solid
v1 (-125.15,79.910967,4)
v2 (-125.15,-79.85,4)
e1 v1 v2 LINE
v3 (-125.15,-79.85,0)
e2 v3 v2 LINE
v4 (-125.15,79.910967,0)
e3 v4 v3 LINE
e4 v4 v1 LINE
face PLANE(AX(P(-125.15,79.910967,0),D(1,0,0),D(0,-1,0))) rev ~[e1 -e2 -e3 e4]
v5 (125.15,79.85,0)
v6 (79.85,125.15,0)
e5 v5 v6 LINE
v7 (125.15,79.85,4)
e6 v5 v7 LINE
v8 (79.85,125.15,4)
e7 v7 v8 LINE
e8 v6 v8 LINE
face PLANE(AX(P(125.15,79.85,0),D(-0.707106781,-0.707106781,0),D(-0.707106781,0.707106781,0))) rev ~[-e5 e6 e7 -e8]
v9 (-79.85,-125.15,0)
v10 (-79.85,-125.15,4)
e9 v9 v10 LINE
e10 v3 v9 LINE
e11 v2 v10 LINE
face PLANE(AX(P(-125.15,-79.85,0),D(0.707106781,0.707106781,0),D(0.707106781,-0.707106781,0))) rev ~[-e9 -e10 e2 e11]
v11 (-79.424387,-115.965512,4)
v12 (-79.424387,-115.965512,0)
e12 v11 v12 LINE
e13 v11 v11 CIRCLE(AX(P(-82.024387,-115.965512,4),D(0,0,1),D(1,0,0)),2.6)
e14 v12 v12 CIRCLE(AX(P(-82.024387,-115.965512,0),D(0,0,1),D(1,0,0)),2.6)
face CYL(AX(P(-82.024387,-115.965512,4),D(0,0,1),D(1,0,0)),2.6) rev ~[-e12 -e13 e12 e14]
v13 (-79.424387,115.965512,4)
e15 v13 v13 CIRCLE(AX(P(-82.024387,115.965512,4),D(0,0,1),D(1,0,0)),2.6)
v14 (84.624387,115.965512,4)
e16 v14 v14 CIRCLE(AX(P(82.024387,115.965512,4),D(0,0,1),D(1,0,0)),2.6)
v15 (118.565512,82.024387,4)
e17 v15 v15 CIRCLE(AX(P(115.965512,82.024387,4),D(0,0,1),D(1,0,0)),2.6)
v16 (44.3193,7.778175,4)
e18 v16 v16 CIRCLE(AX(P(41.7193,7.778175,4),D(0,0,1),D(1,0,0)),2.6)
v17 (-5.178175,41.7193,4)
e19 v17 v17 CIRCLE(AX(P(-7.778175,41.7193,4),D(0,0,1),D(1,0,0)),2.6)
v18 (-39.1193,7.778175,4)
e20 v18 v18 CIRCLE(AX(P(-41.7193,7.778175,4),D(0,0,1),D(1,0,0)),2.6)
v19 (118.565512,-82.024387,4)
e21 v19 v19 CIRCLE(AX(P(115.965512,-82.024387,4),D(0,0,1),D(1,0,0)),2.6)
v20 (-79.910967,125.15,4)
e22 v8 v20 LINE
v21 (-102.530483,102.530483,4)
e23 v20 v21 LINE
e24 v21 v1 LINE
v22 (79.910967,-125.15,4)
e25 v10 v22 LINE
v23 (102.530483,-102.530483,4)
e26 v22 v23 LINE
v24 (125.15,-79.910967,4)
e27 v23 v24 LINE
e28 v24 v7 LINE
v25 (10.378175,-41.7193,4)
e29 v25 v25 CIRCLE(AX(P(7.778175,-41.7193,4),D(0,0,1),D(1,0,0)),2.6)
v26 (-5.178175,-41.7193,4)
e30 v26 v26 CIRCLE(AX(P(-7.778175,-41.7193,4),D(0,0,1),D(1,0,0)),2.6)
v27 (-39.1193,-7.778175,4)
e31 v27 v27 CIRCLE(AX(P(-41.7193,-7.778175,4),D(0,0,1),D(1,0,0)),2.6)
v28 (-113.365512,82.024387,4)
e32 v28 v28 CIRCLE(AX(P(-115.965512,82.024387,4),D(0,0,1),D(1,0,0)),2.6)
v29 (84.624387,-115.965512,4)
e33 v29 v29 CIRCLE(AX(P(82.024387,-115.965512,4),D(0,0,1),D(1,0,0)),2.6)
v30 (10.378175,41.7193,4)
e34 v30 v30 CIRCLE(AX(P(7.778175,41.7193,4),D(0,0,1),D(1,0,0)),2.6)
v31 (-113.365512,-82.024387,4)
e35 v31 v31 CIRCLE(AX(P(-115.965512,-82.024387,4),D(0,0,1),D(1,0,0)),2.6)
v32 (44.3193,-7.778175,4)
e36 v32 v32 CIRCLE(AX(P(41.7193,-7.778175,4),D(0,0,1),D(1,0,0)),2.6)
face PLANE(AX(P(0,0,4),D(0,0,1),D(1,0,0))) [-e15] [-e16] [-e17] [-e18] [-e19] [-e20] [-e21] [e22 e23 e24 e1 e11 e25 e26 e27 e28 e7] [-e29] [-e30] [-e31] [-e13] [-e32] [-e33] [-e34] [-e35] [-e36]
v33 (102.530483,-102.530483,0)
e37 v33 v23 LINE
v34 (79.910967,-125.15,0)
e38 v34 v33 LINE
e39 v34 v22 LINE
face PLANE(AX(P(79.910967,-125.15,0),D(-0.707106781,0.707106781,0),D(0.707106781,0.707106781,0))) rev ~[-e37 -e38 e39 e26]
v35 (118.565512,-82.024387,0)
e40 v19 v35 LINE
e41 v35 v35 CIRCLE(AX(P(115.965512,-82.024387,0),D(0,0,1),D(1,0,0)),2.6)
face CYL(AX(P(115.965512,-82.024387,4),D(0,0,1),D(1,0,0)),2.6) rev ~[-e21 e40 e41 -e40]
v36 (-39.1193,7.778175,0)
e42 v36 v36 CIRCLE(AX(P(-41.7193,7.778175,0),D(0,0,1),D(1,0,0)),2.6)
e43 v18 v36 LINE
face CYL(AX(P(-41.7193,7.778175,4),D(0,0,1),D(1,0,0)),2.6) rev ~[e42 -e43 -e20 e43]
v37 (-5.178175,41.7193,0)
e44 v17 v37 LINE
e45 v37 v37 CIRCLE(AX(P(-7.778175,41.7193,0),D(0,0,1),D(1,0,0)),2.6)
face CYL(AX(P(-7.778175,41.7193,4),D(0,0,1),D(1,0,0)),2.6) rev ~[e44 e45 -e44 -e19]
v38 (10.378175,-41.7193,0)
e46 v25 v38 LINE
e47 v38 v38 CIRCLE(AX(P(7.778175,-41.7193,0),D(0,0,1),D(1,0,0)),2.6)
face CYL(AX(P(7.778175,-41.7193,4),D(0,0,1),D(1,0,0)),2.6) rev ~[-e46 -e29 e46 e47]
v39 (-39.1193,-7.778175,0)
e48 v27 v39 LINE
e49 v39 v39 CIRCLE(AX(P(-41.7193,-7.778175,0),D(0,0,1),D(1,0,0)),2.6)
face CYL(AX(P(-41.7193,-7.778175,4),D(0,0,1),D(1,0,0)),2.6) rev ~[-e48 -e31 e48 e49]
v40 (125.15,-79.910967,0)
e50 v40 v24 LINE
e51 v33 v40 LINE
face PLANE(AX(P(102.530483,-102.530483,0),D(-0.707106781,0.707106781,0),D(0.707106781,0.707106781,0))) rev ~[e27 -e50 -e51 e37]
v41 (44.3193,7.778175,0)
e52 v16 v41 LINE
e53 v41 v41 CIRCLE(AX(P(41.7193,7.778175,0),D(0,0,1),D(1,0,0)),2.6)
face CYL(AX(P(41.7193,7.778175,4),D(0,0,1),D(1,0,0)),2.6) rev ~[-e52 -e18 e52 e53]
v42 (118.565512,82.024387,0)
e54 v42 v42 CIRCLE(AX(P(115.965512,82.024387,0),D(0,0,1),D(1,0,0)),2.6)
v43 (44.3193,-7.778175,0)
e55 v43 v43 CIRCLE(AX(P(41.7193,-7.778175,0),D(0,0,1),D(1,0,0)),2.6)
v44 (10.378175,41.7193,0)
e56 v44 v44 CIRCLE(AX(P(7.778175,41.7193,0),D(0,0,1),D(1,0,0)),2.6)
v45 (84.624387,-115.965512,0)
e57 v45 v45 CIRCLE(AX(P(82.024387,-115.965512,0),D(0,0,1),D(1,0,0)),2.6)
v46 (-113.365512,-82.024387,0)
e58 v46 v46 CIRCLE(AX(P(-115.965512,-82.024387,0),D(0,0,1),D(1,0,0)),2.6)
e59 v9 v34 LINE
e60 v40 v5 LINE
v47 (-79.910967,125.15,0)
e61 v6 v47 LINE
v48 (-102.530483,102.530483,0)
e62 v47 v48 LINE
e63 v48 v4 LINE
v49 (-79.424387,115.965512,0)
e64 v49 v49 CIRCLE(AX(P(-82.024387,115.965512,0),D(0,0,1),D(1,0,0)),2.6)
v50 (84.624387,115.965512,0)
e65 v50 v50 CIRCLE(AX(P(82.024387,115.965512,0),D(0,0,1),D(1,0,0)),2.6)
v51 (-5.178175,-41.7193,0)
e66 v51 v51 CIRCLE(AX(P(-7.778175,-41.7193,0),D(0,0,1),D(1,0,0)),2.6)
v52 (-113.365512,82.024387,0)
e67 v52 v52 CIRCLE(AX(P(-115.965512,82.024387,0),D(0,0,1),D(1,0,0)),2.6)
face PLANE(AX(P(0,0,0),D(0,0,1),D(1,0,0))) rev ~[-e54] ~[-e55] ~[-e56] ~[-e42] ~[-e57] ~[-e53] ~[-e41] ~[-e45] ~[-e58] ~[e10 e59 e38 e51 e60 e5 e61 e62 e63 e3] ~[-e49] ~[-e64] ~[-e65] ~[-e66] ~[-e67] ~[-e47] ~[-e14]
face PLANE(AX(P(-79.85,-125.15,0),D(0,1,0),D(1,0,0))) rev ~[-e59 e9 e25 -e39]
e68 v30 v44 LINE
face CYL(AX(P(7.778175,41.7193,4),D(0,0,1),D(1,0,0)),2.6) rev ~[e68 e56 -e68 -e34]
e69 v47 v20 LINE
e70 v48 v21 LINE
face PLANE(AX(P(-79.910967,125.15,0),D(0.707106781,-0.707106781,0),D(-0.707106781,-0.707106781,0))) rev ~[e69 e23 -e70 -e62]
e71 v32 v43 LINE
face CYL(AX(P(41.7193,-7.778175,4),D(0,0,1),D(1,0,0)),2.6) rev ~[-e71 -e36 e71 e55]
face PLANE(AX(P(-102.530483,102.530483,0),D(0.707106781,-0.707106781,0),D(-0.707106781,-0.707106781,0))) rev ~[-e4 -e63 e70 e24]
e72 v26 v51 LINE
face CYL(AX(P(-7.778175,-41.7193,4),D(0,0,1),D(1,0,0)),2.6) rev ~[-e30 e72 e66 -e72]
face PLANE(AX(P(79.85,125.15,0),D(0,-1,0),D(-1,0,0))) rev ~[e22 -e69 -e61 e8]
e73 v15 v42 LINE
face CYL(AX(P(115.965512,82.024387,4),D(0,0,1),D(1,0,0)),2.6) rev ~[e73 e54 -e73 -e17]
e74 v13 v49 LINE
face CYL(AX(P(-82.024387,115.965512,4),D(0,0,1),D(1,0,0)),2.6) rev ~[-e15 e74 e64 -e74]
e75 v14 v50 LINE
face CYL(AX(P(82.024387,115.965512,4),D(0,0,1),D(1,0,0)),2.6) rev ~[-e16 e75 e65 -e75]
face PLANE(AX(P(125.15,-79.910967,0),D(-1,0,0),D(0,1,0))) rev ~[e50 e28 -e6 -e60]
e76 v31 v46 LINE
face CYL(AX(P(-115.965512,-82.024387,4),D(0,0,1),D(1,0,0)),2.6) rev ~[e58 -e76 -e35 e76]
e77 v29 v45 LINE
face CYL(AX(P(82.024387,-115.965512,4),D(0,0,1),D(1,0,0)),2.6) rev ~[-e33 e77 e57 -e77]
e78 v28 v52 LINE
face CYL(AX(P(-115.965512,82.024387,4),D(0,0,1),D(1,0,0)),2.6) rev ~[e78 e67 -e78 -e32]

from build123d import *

# Parameters (mm, degrees)
F1_DEPTH = 4
F2_R     = 2.6
F3_DEPTH = 20
F4_R     = 2.6
F5_DEPTH = 4.001


# Not quite as in the source:
# - a feature names something its author has since deleted; it is built from what else it names


with BuildPart() as f1:
    # F0 (on Top) → F1 (new body)
    with BuildSketch(Plane.XY):
        Polygon((125.15, 79.85), (102.5, 102.5), (79.85, 125.15), (-79.9109665441, 125.15), (-102.530483272, 102.530483272), (-125.15, 79.9109665441), (-125.15, -79.85), (-102.5, -102.5), (-79.85, -125.15), (79.9109665441, -125.15), (102.530483272, -102.530483272), (125.15, -79.9109665441), align=None)
    extrude(amount=F1_DEPTH)

    # F2 (on face) → F3 (cut)
    with BuildSketch(Plane.XY.offset(4)):
        with Locations((-7.7781745931, 41.71930009)):
            Circle(F2_R)
        with Locations((-41.71930009, 7.7781745931)):
            Circle(F2_R)
        with Locations((7.7781745931, -41.71930009)):
            Circle(F2_R)
        with Locations((41.71930009, -7.7781745931)):
            Circle(F2_R)
        with Locations((41.71930009, 7.7781745931)):
            Circle(F2_R)
        with Locations((7.7781745931, 41.71930009)):
            Circle(F2_R)
        with Locations((-41.71930009, -7.7781745931)):
            Circle(F2_R)
        with Locations((-7.7781745931, -41.71930009)):
            Circle(F2_R)
    extrude(amount=-F3_DEPTH, mode=Mode.SUBTRACT)

    # F4 (on face) → F5 (cut, through all)
    with BuildSketch(Plane.XY.offset(4)):
        with Locations((-82.0243866176, 115.9655121146)):
            Circle(F4_R)
        with Locations((-115.9655121146, 82.0243866176)):
            Circle(F4_R)
        with Locations((82.0243866176, -115.9655121146)):
            Circle(F4_R)
        with Locations((115.9655121146, -82.0243866176)):
            Circle(F4_R)
        with Locations((82.0243866176, 115.9655121146)):
            Circle(F4_R)
        with Locations((115.9655121146, 82.0243866176)):
            Circle(F4_R)
        with Locations((-115.9655121146, -82.0243866176)):
            Circle(F4_R)
        with Locations((-82.0243866176, -115.9655121146)):
            Circle(F4_R)
    extrude(amount=-F5_DEPTH, mode=Mode.SUBTRACT)


solid = f1.part
